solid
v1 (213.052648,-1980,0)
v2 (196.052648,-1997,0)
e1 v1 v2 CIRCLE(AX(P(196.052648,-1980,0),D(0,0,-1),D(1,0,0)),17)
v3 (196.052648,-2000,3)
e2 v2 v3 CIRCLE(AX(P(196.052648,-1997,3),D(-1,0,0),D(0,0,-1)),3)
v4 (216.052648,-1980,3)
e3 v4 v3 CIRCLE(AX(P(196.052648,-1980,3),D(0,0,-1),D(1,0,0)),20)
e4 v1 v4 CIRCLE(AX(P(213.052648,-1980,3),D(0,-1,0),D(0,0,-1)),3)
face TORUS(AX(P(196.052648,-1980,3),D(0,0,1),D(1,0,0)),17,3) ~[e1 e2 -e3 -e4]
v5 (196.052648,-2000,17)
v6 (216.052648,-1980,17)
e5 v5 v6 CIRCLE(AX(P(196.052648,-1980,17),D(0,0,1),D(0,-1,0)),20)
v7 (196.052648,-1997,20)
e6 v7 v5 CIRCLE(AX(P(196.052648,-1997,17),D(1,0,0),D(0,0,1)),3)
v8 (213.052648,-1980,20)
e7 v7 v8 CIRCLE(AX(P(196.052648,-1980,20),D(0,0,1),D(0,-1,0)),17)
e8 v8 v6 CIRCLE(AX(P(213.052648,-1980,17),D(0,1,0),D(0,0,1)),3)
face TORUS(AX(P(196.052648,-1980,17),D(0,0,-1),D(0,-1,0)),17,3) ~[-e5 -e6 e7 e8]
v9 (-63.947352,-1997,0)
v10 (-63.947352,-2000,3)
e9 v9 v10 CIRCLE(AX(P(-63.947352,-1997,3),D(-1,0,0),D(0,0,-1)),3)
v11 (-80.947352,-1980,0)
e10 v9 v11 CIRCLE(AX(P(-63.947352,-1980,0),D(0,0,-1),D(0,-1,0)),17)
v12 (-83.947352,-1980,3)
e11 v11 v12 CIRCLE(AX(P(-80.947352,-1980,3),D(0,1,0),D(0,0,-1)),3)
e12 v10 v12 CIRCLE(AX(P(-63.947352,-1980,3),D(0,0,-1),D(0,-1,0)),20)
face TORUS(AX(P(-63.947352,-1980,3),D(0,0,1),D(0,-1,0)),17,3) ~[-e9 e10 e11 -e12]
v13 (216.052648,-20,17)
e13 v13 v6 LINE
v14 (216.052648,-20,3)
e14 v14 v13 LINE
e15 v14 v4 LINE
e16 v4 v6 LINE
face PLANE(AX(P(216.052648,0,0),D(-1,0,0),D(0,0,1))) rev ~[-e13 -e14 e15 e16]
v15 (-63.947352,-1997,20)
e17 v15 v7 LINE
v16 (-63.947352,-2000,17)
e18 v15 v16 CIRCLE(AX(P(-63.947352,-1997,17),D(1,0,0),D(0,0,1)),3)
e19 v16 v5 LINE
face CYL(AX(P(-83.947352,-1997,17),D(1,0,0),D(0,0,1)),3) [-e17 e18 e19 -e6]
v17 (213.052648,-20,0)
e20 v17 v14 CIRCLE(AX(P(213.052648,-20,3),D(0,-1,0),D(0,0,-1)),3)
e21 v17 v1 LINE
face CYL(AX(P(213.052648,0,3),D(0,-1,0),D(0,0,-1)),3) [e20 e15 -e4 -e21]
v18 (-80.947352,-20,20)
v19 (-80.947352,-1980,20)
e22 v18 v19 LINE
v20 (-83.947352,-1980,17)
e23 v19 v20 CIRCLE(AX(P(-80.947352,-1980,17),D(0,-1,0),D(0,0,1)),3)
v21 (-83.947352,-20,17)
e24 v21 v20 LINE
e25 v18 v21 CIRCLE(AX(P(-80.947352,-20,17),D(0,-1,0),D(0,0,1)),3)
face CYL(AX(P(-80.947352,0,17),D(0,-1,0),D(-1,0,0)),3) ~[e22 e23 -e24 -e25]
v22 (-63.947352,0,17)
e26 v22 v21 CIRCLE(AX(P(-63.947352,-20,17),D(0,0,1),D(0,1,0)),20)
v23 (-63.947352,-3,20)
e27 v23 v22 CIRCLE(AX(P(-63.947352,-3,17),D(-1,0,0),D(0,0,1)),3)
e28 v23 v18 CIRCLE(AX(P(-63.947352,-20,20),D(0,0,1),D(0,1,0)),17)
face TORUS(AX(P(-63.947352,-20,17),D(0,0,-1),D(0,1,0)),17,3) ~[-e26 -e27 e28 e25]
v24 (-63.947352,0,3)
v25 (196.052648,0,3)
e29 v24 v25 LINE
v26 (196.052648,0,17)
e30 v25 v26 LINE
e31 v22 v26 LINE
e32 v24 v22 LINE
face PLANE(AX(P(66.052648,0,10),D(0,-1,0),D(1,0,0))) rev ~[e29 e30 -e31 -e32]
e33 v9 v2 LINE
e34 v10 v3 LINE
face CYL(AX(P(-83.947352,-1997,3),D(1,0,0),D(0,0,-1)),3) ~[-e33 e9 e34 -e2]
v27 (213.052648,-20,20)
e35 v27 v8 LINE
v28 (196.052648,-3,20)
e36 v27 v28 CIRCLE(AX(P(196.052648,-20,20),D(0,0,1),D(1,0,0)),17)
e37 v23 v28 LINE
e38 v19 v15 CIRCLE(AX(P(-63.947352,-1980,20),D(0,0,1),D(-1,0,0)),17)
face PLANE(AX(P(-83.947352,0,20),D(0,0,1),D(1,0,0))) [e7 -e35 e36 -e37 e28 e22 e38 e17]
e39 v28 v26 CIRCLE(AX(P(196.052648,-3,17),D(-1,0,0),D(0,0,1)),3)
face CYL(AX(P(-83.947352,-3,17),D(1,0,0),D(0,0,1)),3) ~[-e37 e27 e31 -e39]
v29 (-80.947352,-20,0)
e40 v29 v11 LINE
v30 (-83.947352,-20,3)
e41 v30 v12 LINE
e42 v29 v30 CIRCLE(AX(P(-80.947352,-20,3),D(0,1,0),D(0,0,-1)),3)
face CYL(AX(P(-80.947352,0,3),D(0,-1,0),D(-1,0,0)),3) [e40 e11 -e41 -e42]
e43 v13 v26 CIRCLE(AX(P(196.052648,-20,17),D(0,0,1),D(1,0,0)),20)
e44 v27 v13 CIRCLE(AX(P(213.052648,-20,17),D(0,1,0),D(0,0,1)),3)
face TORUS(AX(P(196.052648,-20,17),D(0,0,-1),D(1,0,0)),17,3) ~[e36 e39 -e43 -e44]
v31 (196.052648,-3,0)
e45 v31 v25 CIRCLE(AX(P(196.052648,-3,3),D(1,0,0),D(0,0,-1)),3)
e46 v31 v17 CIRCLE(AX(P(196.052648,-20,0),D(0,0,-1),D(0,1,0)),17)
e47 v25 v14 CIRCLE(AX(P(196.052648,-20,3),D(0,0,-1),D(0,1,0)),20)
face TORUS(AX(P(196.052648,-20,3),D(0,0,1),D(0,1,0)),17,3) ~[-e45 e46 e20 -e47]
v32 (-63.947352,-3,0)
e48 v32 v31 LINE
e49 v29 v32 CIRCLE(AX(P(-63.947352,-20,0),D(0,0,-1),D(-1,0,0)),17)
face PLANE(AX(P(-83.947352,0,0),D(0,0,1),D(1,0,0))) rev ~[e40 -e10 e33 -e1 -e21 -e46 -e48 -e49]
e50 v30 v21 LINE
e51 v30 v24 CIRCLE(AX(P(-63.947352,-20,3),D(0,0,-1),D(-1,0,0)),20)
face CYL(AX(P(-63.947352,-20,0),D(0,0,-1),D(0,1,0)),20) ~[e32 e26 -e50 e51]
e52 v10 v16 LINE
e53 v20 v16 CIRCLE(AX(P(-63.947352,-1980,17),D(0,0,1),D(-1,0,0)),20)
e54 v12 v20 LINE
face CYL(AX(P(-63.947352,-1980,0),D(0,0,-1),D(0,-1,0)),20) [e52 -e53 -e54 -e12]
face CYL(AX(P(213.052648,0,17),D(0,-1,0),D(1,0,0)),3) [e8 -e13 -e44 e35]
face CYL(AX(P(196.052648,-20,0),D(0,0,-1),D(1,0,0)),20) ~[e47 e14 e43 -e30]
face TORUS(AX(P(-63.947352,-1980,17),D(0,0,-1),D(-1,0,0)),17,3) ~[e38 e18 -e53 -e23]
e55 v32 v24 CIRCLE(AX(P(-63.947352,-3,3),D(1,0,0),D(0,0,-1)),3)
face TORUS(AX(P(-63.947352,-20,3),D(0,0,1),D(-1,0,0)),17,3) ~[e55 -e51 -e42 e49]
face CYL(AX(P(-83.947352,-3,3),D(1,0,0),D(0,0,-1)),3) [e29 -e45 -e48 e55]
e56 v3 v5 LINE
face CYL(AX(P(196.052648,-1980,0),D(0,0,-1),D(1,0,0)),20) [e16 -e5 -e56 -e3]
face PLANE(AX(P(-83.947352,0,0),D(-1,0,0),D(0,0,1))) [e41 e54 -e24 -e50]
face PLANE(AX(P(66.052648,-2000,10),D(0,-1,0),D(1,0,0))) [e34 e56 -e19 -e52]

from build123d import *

# Parameters (mm, degrees)
F0_W         = 300
F0_H         = 20
F1_DEPTH     = 2000
F2_R         = 3
F3_T1_DEPTH  = 20
F3_T4_ANGLE  = 90
F3_T6_ANGLE  = 90
F3_T8_ANGLE  = 90
F3_T10_ANGLE = 90
F3_T12_ANGLE = 90
F3_T14_ANGLE = 90
F3_T16_ANGLE = 90
F3_T18_ANGLE = 90


# Not quite as in the source:
# - a fillet or chamfer that OpenCascade refuses, or shapes differently, is made with other operations: its cross-section is extruded or revolved along the edge and cut away or added


with BuildPart() as f1:
    # F0 (on Front) → F1 (new body)
    with BuildSketch(Plane.XZ):
        with Locations((66.0526476468, 10)):
            Rectangle(F0_W, F0_H)
    extrude(amount=F1_DEPTH)

    # F2
    f2_edges = [f1.edges().sort_by_distance(p)[0] for p in [
        (216.052648, -1000, 20),
        (-83.947352, -1000, 20),
        (66.052648, 0, 20),
        (66.052648, -2000, 20),
        (-83.947352, -1000, 0),
        (216.052648, -1000, 0),
        (66.052648, 0, 0),
        (66.052648, -2000, 0),
    ]]
    fillet(f2_edges, radius=F2_R)

    # F3: fillet of radius 20 on 4 edges, made by hand

    # F3_s2 → F3_t1 (cut)
    with BuildSketch(Plane.XY):
        with BuildLine():
            ThreePointArc((216.0526476468, -20), (210.1947832705, -5.8578643763), (196.0526476468, 0))
            Line((196.0526476468, 0), (216.0526476468, 0))
            Line((216.0526476468, 0), (216.0526476468, -20))
        make_face()
        with BuildLine():
            ThreePointArc((-63.9473523532, 0), (-78.0894879769, -5.8578643763), (-83.9473523532, -20))
            Line((-83.9473523532, -20), (-83.9473523532, 0))
            Line((-83.9473523532, 0), (-63.9473523532, 0))
        make_face()
        with BuildLine():
            ThreePointArc((216.0526476468, -1980), (210.1947832705, -1994.1421356237), (196.0526476468, -2000))
            Line((196.0526476468, -2000), (216.0526476468, -2000))
            Line((216.0526476468, -2000), (216.0526476468, -1980))
        make_face()
        with BuildLine():
            ThreePointArc((-63.9473523532, -2000), (-78.0894879769, -1994.1421356237), (-83.9473523532, -1980))
            Line((-83.9473523532, -1980), (-83.9473523532, -2000))
            Line((-83.9473523532, -2000), (-63.9473523532, -2000))
        make_face()
    extrude(amount=F3_T1_DEPTH, mode=Mode.SUBTRACT)

    # F3_s3 → F3_t4 (revolve, cut)
    with BuildSketch(Plane.XZ.offset(1980)):
        with BuildLine():
            ThreePointArc((-80.9473523532, 20), (-83.0686726968, 19.1213203436), (-83.9473523532, 17))
            Line((-83.9473523532, 17), (-83.9473523532, 20))
            Line((-83.9473523532, 20), (-80.9473523532, 20))
        make_face()
    revolve(axis=Axis((-63.9473523532, -1980, 20), (0, 0, 1)), revolution_arc=F3_T4_ANGLE, mode=Mode.SUBTRACT)

    # F3_s5 → F3_t6 (revolve, cut)
    with BuildSketch(Plane.YZ.offset(-63.9473523532)):
        with BuildLine():
            ThreePointArc((-1997, 0), (-1999.1213203436, 0.8786796564), (-2000, 3))
            Line((-2000, 3), (-2000, 0))
            Line((-2000, 0), (-1997, 0))
        make_face()
    revolve(axis=Axis((-63.9473523532, -1980, 0), (0, 0, -1)), revolution_arc=F3_T6_ANGLE, mode=Mode.SUBTRACT)

    # F3_s7 → F3_t8 (revolve, cut)
    with BuildSketch(Plane.XZ.offset(1980)):
        with BuildLine():
            ThreePointArc((213.0526476468, 0), (215.1739679904, 0.8786796564), (216.0526476468, 3))
            Line((216.0526476468, 3), (216.0526476468, 0))
            Line((216.0526476468, 0), (213.0526476468, 0))
        make_face()
    revolve(axis=Axis((196.0526476468, -1980, 0), (0, 0, -1)), revolution_arc=F3_T8_ANGLE, mode=Mode.SUBTRACT)

    # F3_s9 → F3_t10 (revolve, cut)
    with BuildSketch(Plane.YZ.offset(196.0526476468)):
        with BuildLine():
            ThreePointArc((-1997, 20), (-1999.1213203436, 19.1213203436), (-2000, 17))
            Line((-2000, 17), (-2000, 20))
            Line((-2000, 20), (-1997, 20))
        make_face()
    revolve(axis=Axis((196.0526476468, -1980, 20), (0, 0, 1)), revolution_arc=F3_T10_ANGLE, mode=Mode.SUBTRACT)

    # F3_s11 → F3_t12 (revolve, cut)
    with BuildSketch(Plane.YZ.offset(-63.9473523532)):
        with BuildLine():
            ThreePointArc((-3, 20), (-0.8786796564, 19.1213203436), (0, 17))
            Line((0, 17), (0, 20))
            Line((0, 20), (-3, 20))
        make_face()
    revolve(axis=Axis((-63.9473523532, -20, 20), (0, 0, 1)), revolution_arc=F3_T12_ANGLE, mode=Mode.SUBTRACT)

    # F3_s13 → F3_t14 (revolve, cut)
    with BuildSketch(Plane.XZ.offset(20)):
        with BuildLine():
            ThreePointArc((-80.9473523532, 0), (-83.0686726968, 0.8786796564), (-83.9473523532, 3))
            Line((-83.9473523532, 3), (-83.9473523532, 0))
            Line((-83.9473523532, 0), (-80.9473523532, 0))
        make_face()
    revolve(axis=Axis((-63.9473523532, -20, 0), (0, 0, -1)), revolution_arc=F3_T14_ANGLE, mode=Mode.SUBTRACT)

    # F3_s15 → F3_t16 (revolve, cut)
    with BuildSketch(Plane.YZ.offset(196.0526476468)):
        with BuildLine():
            ThreePointArc((-3, 0), (-0.8786796564, 0.8786796564), (0, 3))
            Line((0, 3), (0, 0))
            Line((0, 0), (-3, 0))
        make_face()
    revolve(axis=Axis((196.0526476468, -20, 0), (0, 0, -1)), revolution_arc=F3_T16_ANGLE, mode=Mode.SUBTRACT)

    # F3_s17 → F3_t18 (revolve, cut)
    with BuildSketch(Plane.XZ.offset(20)):
        with BuildLine():
            ThreePointArc((213.0526476468, 20), (215.1739679904, 19.1213203436), (216.0526476468, 17))
            Line((216.0526476468, 17), (216.0526476468, 20))
            Line((216.0526476468, 20), (213.0526476468, 20))
        make_face()
    revolve(axis=Axis((196.0526476468, -20, 20), (0, 0, 1)), revolution_arc=F3_T18_ANGLE, mode=Mode.SUBTRACT)


solid = f1.part
